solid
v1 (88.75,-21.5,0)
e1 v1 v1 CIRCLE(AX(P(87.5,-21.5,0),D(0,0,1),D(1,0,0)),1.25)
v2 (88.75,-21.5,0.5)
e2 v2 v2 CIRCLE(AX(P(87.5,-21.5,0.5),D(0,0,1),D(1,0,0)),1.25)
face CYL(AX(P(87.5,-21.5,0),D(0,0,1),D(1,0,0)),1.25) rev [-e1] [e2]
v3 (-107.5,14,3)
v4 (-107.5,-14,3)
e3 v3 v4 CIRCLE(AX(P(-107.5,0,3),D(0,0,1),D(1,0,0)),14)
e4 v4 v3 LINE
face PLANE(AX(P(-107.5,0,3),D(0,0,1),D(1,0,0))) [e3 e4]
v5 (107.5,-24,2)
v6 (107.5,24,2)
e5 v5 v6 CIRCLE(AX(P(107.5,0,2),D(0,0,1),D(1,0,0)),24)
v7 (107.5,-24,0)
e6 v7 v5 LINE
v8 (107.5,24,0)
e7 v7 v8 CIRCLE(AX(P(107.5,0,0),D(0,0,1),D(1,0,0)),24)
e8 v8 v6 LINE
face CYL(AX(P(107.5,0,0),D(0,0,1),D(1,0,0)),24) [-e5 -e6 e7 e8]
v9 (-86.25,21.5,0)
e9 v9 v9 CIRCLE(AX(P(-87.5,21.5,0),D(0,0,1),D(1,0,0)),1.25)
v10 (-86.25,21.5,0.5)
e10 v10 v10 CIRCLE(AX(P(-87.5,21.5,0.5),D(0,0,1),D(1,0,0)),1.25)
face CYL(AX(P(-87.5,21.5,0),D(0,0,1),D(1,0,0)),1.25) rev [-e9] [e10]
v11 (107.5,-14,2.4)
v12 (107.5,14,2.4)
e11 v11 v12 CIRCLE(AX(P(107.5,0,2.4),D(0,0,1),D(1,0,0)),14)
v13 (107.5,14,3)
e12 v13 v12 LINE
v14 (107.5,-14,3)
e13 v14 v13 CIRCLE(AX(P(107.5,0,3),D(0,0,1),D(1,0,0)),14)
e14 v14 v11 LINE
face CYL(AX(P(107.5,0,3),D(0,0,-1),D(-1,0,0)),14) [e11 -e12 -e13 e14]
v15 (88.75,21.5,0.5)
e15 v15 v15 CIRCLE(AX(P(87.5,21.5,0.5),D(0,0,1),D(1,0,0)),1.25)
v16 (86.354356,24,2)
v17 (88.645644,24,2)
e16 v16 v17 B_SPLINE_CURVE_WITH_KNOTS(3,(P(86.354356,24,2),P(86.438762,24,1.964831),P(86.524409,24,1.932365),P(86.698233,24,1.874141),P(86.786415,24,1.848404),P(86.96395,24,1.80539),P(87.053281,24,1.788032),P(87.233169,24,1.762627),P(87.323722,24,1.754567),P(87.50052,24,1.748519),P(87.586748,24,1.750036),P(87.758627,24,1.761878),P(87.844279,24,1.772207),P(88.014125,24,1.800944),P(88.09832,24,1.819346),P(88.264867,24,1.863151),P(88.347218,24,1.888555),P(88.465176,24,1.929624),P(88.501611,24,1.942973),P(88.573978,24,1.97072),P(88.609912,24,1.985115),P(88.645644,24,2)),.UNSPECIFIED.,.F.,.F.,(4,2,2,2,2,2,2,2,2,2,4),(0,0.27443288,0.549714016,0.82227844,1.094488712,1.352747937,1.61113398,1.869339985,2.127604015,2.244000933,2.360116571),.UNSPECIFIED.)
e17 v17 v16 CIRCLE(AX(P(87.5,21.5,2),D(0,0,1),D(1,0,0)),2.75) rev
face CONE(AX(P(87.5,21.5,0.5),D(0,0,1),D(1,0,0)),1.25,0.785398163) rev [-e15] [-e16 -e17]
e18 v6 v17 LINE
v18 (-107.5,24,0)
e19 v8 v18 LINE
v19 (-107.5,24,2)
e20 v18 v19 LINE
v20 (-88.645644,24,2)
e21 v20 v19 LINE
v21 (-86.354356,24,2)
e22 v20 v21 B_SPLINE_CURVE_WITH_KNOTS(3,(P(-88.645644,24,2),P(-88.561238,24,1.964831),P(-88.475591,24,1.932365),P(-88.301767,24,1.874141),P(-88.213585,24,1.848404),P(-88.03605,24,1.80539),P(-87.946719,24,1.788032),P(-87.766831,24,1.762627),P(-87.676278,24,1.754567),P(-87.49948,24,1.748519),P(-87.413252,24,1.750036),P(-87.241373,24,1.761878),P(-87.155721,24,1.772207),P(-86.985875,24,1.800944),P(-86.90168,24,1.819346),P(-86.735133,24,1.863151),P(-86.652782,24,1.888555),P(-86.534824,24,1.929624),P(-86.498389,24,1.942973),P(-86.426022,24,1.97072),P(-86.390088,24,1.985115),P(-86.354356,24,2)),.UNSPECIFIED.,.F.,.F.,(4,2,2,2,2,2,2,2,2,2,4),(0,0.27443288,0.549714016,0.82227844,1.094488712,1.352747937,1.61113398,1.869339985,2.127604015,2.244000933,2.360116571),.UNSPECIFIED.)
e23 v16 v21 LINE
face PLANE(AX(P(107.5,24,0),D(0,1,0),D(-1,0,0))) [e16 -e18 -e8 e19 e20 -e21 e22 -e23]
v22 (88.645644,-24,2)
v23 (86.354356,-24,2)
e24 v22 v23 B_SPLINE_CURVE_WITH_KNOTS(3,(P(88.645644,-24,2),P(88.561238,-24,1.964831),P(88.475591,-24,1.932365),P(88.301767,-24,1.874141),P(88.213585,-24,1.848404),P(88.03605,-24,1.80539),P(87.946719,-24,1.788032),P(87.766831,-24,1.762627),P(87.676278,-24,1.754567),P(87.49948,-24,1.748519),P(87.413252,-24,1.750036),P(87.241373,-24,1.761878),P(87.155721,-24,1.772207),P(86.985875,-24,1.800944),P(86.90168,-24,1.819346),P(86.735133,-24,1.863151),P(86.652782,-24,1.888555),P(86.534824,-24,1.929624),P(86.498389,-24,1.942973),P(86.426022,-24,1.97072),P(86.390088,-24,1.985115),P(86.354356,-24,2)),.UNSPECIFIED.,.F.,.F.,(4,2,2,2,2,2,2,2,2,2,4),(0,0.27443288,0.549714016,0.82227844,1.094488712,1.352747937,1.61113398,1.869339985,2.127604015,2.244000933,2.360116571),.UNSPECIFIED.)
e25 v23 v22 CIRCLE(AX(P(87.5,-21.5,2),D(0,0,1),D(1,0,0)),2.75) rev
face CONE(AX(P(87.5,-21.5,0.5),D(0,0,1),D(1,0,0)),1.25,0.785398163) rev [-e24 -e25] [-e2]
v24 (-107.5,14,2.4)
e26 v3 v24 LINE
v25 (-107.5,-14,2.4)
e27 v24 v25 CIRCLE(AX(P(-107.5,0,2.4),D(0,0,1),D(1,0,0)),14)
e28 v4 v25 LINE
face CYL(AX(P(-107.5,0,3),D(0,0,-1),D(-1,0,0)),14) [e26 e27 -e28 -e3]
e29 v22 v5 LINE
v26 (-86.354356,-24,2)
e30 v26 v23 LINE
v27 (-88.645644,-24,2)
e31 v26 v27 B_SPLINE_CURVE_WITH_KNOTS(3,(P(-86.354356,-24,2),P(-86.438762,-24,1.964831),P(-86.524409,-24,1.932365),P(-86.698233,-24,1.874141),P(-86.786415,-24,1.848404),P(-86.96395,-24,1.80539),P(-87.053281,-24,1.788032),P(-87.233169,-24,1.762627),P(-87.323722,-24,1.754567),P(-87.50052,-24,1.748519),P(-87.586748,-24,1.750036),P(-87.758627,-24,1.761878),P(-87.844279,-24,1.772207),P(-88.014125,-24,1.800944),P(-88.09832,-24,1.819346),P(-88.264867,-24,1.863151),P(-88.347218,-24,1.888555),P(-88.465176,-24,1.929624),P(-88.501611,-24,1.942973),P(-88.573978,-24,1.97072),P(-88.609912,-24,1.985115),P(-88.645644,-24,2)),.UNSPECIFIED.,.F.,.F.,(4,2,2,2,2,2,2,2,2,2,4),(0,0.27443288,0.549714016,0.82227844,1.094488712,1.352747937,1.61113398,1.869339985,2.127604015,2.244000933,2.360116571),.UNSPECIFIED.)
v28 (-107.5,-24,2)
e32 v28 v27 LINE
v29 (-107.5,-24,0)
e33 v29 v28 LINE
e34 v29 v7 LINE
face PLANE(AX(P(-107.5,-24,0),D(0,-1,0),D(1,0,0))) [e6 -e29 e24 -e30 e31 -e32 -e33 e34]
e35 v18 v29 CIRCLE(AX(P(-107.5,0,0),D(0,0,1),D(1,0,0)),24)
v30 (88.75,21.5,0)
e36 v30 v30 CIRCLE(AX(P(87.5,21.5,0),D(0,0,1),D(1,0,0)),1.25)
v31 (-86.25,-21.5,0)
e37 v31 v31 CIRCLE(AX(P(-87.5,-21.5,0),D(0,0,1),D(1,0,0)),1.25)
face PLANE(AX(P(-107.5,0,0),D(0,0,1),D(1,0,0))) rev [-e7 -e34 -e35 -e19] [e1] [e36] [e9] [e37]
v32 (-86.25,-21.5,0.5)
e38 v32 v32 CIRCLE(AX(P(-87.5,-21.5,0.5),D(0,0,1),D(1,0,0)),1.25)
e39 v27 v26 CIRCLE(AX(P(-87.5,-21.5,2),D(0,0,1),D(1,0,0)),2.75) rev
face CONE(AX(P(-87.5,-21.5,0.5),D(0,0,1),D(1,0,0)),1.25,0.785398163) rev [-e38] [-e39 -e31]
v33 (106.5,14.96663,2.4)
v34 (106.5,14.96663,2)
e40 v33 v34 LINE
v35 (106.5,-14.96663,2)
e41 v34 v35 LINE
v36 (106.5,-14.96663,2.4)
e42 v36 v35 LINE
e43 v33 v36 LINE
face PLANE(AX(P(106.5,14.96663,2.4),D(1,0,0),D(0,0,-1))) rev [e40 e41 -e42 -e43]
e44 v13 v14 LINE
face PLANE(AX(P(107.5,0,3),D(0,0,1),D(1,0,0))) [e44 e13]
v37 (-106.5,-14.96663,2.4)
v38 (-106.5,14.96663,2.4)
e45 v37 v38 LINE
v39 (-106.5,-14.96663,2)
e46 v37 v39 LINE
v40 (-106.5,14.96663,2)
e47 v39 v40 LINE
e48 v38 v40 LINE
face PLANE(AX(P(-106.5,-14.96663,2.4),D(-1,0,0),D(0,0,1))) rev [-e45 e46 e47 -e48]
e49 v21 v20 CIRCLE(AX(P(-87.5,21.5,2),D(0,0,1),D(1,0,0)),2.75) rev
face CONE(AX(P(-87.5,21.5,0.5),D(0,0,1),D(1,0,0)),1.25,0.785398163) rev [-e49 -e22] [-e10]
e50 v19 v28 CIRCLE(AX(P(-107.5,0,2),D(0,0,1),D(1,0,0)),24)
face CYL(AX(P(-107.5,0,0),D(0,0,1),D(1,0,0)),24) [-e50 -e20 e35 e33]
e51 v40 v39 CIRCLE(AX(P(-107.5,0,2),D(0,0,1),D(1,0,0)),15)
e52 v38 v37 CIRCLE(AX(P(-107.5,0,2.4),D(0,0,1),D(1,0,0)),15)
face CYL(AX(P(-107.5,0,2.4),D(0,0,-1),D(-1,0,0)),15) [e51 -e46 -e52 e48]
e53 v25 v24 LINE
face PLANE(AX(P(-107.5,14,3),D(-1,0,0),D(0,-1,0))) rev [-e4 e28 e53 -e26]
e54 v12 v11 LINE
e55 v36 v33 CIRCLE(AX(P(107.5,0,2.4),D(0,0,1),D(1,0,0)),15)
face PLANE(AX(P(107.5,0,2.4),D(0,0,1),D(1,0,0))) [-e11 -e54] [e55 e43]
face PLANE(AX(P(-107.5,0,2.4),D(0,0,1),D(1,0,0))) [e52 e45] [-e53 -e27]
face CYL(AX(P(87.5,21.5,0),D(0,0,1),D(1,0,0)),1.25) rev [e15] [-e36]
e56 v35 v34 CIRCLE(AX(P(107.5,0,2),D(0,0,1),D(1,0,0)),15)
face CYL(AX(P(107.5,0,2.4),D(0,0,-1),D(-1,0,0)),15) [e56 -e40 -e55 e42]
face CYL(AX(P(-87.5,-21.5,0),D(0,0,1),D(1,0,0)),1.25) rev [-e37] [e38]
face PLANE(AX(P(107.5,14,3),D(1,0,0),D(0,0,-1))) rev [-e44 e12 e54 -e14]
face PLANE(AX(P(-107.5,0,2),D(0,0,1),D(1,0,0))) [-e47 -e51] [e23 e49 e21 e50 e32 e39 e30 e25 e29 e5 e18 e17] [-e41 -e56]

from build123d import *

# Parameters (mm, degrees)
CROQUIS2_R              = 1.25
SALIENTE_EXTRUIR1_DEPTH = 2
CHAFL_N1_SIZE           = 1.5
SALIENTE_EXTRUIR2_DEPTH = 1
SALIENTE_EXTRUIR3_DEPTH = 0.4


with BuildPart() as part:
    # Croquis2 → Saliente-Extruir1 (new body)
    with BuildSketch(Plane.XY.offset(2)):
        with BuildLine():
            Line((-107.5, -24), (107.5, -24))
            ThreePointArc((107.5, -24), (131.5, 0), (107.5, 24))
            Line((107.5, 24), (-107.5, 24))
            ThreePointArc((-107.5, 24), (-131.5, 0), (-107.5, -24))
        make_face()
        with Locations((-87.5, -21.5)):
            Circle(CROQUIS2_R, mode=Mode.SUBTRACT)
        with Locations((-87.5, 21.5)):
            Circle(CROQUIS2_R, mode=Mode.SUBTRACT)
        with Locations((87.5, 21.5)):
            Circle(CROQUIS2_R, mode=Mode.SUBTRACT)
        with Locations((87.5, -21.5)):
            Circle(CROQUIS2_R, mode=Mode.SUBTRACT)
    extrude(amount=-SALIENTE_EXTRUIR1_DEPTH)

    # Chaflán1
    # the kernel refuses this chamfer: 1.5 mm, written as the material it takes off along each edge
    with BuildSketch(Plane(origin=(-87.5, -21.5, 2), x_dir=(1, 0, 0), z_dir=(0, -1, 0))) as chafl_n1_piece_1:
        Polygon((1.25, -CHAFL_N1_SIZE), (1.25 + CHAFL_N1_SIZE, 0), (1.25, 0), align=None)
    revolve(axis=Axis((-87.5, -21.5, 2), (0, 0, 1)), mode=Mode.SUBTRACT)
    with BuildSketch(Plane(origin=(-87.5, 21.5, 2), x_dir=(1, 0, 0), z_dir=(0, -1, 0))) as chafl_n1_piece_2:
        Polygon((1.25, -CHAFL_N1_SIZE), (1.25 + CHAFL_N1_SIZE, 0), (1.25, 0), align=None)
    revolve(axis=Axis((-87.5, 21.5, 2), (0, 0, 1)), mode=Mode.SUBTRACT)
    with BuildSketch(Plane(origin=(87.5, 21.5, 2), x_dir=(1, 0, 0), z_dir=(0, -1, 0))) as chafl_n1_piece_3:
        Polygon((1.25, -CHAFL_N1_SIZE), (1.25 + CHAFL_N1_SIZE, 0), (1.25, 0), align=None)
    revolve(axis=Axis((87.5, 21.5, 2), (0, 0, 1)), mode=Mode.SUBTRACT)
    with BuildSketch(Plane(origin=(87.5, -21.5, 2), x_dir=(1, 0, 0), z_dir=(0, -1, 0))) as chafl_n1_piece_4:
        Polygon((1.25, -CHAFL_N1_SIZE), (1.25 + CHAFL_N1_SIZE, 0), (1.25, 0), align=None)
    revolve(axis=Axis((87.5, -21.5, 2), (0, 0, 1)), mode=Mode.SUBTRACT)

    # Croquis3 → Saliente-Extruir2 (add)
    with BuildSketch(Plane.XY.offset(2)):
        with BuildLine():
            Line((-107.5, 14), (-107.5, -14))
            ThreePointArc((-107.5, -14), (-121.5, 0), (-107.5, 14))
        make_face()
        with BuildLine():
            Line((107.5, 14), (107.5, -14))
            ThreePointArc((107.5, -14), (121.5, 0), (107.5, 14))
        make_face()
    extrude(amount=SALIENTE_EXTRUIR2_DEPTH)

    # Croquis4 → Saliente-Extruir3 (add)
    # profile 1 of 2: a face of its own
    with BuildSketch(Plane.XY.offset(2)):
        with BuildLine():
            Line((-106.5, -14.966629547), (-106.5, 14.966629547))
            ThreePointArc((-106.5, 14.966629547), (-122.5, 0), (-106.5, -14.966629547))
        make_face()
        with BuildLine():
            Line((-107.5, -14), (-107.5, 14))
            ThreePointArc((-107.5, 14), (-121.5, 0), (-107.5, -14))
        make_face(mode=Mode.SUBTRACT)
    # profile 2 of 2: a face of its own
    with BuildSketch(Plane.XY.offset(2)):
        with BuildLine():
            Line((106.5, 14.966629547), (106.5, -14.966629547))
            ThreePointArc((106.5, -14.966629547), (122.5, 0), (106.5, 14.966629547))
        make_face()
        with BuildLine():
            Line((107.5, 14), (107.5, -14))
            ThreePointArc((107.5, -14), (121.5, 0), (107.5, 14))
        make_face(mode=Mode.SUBTRACT)
    extrude(amount=SALIENTE_EXTRUIR3_DEPTH)


solid = part.part
